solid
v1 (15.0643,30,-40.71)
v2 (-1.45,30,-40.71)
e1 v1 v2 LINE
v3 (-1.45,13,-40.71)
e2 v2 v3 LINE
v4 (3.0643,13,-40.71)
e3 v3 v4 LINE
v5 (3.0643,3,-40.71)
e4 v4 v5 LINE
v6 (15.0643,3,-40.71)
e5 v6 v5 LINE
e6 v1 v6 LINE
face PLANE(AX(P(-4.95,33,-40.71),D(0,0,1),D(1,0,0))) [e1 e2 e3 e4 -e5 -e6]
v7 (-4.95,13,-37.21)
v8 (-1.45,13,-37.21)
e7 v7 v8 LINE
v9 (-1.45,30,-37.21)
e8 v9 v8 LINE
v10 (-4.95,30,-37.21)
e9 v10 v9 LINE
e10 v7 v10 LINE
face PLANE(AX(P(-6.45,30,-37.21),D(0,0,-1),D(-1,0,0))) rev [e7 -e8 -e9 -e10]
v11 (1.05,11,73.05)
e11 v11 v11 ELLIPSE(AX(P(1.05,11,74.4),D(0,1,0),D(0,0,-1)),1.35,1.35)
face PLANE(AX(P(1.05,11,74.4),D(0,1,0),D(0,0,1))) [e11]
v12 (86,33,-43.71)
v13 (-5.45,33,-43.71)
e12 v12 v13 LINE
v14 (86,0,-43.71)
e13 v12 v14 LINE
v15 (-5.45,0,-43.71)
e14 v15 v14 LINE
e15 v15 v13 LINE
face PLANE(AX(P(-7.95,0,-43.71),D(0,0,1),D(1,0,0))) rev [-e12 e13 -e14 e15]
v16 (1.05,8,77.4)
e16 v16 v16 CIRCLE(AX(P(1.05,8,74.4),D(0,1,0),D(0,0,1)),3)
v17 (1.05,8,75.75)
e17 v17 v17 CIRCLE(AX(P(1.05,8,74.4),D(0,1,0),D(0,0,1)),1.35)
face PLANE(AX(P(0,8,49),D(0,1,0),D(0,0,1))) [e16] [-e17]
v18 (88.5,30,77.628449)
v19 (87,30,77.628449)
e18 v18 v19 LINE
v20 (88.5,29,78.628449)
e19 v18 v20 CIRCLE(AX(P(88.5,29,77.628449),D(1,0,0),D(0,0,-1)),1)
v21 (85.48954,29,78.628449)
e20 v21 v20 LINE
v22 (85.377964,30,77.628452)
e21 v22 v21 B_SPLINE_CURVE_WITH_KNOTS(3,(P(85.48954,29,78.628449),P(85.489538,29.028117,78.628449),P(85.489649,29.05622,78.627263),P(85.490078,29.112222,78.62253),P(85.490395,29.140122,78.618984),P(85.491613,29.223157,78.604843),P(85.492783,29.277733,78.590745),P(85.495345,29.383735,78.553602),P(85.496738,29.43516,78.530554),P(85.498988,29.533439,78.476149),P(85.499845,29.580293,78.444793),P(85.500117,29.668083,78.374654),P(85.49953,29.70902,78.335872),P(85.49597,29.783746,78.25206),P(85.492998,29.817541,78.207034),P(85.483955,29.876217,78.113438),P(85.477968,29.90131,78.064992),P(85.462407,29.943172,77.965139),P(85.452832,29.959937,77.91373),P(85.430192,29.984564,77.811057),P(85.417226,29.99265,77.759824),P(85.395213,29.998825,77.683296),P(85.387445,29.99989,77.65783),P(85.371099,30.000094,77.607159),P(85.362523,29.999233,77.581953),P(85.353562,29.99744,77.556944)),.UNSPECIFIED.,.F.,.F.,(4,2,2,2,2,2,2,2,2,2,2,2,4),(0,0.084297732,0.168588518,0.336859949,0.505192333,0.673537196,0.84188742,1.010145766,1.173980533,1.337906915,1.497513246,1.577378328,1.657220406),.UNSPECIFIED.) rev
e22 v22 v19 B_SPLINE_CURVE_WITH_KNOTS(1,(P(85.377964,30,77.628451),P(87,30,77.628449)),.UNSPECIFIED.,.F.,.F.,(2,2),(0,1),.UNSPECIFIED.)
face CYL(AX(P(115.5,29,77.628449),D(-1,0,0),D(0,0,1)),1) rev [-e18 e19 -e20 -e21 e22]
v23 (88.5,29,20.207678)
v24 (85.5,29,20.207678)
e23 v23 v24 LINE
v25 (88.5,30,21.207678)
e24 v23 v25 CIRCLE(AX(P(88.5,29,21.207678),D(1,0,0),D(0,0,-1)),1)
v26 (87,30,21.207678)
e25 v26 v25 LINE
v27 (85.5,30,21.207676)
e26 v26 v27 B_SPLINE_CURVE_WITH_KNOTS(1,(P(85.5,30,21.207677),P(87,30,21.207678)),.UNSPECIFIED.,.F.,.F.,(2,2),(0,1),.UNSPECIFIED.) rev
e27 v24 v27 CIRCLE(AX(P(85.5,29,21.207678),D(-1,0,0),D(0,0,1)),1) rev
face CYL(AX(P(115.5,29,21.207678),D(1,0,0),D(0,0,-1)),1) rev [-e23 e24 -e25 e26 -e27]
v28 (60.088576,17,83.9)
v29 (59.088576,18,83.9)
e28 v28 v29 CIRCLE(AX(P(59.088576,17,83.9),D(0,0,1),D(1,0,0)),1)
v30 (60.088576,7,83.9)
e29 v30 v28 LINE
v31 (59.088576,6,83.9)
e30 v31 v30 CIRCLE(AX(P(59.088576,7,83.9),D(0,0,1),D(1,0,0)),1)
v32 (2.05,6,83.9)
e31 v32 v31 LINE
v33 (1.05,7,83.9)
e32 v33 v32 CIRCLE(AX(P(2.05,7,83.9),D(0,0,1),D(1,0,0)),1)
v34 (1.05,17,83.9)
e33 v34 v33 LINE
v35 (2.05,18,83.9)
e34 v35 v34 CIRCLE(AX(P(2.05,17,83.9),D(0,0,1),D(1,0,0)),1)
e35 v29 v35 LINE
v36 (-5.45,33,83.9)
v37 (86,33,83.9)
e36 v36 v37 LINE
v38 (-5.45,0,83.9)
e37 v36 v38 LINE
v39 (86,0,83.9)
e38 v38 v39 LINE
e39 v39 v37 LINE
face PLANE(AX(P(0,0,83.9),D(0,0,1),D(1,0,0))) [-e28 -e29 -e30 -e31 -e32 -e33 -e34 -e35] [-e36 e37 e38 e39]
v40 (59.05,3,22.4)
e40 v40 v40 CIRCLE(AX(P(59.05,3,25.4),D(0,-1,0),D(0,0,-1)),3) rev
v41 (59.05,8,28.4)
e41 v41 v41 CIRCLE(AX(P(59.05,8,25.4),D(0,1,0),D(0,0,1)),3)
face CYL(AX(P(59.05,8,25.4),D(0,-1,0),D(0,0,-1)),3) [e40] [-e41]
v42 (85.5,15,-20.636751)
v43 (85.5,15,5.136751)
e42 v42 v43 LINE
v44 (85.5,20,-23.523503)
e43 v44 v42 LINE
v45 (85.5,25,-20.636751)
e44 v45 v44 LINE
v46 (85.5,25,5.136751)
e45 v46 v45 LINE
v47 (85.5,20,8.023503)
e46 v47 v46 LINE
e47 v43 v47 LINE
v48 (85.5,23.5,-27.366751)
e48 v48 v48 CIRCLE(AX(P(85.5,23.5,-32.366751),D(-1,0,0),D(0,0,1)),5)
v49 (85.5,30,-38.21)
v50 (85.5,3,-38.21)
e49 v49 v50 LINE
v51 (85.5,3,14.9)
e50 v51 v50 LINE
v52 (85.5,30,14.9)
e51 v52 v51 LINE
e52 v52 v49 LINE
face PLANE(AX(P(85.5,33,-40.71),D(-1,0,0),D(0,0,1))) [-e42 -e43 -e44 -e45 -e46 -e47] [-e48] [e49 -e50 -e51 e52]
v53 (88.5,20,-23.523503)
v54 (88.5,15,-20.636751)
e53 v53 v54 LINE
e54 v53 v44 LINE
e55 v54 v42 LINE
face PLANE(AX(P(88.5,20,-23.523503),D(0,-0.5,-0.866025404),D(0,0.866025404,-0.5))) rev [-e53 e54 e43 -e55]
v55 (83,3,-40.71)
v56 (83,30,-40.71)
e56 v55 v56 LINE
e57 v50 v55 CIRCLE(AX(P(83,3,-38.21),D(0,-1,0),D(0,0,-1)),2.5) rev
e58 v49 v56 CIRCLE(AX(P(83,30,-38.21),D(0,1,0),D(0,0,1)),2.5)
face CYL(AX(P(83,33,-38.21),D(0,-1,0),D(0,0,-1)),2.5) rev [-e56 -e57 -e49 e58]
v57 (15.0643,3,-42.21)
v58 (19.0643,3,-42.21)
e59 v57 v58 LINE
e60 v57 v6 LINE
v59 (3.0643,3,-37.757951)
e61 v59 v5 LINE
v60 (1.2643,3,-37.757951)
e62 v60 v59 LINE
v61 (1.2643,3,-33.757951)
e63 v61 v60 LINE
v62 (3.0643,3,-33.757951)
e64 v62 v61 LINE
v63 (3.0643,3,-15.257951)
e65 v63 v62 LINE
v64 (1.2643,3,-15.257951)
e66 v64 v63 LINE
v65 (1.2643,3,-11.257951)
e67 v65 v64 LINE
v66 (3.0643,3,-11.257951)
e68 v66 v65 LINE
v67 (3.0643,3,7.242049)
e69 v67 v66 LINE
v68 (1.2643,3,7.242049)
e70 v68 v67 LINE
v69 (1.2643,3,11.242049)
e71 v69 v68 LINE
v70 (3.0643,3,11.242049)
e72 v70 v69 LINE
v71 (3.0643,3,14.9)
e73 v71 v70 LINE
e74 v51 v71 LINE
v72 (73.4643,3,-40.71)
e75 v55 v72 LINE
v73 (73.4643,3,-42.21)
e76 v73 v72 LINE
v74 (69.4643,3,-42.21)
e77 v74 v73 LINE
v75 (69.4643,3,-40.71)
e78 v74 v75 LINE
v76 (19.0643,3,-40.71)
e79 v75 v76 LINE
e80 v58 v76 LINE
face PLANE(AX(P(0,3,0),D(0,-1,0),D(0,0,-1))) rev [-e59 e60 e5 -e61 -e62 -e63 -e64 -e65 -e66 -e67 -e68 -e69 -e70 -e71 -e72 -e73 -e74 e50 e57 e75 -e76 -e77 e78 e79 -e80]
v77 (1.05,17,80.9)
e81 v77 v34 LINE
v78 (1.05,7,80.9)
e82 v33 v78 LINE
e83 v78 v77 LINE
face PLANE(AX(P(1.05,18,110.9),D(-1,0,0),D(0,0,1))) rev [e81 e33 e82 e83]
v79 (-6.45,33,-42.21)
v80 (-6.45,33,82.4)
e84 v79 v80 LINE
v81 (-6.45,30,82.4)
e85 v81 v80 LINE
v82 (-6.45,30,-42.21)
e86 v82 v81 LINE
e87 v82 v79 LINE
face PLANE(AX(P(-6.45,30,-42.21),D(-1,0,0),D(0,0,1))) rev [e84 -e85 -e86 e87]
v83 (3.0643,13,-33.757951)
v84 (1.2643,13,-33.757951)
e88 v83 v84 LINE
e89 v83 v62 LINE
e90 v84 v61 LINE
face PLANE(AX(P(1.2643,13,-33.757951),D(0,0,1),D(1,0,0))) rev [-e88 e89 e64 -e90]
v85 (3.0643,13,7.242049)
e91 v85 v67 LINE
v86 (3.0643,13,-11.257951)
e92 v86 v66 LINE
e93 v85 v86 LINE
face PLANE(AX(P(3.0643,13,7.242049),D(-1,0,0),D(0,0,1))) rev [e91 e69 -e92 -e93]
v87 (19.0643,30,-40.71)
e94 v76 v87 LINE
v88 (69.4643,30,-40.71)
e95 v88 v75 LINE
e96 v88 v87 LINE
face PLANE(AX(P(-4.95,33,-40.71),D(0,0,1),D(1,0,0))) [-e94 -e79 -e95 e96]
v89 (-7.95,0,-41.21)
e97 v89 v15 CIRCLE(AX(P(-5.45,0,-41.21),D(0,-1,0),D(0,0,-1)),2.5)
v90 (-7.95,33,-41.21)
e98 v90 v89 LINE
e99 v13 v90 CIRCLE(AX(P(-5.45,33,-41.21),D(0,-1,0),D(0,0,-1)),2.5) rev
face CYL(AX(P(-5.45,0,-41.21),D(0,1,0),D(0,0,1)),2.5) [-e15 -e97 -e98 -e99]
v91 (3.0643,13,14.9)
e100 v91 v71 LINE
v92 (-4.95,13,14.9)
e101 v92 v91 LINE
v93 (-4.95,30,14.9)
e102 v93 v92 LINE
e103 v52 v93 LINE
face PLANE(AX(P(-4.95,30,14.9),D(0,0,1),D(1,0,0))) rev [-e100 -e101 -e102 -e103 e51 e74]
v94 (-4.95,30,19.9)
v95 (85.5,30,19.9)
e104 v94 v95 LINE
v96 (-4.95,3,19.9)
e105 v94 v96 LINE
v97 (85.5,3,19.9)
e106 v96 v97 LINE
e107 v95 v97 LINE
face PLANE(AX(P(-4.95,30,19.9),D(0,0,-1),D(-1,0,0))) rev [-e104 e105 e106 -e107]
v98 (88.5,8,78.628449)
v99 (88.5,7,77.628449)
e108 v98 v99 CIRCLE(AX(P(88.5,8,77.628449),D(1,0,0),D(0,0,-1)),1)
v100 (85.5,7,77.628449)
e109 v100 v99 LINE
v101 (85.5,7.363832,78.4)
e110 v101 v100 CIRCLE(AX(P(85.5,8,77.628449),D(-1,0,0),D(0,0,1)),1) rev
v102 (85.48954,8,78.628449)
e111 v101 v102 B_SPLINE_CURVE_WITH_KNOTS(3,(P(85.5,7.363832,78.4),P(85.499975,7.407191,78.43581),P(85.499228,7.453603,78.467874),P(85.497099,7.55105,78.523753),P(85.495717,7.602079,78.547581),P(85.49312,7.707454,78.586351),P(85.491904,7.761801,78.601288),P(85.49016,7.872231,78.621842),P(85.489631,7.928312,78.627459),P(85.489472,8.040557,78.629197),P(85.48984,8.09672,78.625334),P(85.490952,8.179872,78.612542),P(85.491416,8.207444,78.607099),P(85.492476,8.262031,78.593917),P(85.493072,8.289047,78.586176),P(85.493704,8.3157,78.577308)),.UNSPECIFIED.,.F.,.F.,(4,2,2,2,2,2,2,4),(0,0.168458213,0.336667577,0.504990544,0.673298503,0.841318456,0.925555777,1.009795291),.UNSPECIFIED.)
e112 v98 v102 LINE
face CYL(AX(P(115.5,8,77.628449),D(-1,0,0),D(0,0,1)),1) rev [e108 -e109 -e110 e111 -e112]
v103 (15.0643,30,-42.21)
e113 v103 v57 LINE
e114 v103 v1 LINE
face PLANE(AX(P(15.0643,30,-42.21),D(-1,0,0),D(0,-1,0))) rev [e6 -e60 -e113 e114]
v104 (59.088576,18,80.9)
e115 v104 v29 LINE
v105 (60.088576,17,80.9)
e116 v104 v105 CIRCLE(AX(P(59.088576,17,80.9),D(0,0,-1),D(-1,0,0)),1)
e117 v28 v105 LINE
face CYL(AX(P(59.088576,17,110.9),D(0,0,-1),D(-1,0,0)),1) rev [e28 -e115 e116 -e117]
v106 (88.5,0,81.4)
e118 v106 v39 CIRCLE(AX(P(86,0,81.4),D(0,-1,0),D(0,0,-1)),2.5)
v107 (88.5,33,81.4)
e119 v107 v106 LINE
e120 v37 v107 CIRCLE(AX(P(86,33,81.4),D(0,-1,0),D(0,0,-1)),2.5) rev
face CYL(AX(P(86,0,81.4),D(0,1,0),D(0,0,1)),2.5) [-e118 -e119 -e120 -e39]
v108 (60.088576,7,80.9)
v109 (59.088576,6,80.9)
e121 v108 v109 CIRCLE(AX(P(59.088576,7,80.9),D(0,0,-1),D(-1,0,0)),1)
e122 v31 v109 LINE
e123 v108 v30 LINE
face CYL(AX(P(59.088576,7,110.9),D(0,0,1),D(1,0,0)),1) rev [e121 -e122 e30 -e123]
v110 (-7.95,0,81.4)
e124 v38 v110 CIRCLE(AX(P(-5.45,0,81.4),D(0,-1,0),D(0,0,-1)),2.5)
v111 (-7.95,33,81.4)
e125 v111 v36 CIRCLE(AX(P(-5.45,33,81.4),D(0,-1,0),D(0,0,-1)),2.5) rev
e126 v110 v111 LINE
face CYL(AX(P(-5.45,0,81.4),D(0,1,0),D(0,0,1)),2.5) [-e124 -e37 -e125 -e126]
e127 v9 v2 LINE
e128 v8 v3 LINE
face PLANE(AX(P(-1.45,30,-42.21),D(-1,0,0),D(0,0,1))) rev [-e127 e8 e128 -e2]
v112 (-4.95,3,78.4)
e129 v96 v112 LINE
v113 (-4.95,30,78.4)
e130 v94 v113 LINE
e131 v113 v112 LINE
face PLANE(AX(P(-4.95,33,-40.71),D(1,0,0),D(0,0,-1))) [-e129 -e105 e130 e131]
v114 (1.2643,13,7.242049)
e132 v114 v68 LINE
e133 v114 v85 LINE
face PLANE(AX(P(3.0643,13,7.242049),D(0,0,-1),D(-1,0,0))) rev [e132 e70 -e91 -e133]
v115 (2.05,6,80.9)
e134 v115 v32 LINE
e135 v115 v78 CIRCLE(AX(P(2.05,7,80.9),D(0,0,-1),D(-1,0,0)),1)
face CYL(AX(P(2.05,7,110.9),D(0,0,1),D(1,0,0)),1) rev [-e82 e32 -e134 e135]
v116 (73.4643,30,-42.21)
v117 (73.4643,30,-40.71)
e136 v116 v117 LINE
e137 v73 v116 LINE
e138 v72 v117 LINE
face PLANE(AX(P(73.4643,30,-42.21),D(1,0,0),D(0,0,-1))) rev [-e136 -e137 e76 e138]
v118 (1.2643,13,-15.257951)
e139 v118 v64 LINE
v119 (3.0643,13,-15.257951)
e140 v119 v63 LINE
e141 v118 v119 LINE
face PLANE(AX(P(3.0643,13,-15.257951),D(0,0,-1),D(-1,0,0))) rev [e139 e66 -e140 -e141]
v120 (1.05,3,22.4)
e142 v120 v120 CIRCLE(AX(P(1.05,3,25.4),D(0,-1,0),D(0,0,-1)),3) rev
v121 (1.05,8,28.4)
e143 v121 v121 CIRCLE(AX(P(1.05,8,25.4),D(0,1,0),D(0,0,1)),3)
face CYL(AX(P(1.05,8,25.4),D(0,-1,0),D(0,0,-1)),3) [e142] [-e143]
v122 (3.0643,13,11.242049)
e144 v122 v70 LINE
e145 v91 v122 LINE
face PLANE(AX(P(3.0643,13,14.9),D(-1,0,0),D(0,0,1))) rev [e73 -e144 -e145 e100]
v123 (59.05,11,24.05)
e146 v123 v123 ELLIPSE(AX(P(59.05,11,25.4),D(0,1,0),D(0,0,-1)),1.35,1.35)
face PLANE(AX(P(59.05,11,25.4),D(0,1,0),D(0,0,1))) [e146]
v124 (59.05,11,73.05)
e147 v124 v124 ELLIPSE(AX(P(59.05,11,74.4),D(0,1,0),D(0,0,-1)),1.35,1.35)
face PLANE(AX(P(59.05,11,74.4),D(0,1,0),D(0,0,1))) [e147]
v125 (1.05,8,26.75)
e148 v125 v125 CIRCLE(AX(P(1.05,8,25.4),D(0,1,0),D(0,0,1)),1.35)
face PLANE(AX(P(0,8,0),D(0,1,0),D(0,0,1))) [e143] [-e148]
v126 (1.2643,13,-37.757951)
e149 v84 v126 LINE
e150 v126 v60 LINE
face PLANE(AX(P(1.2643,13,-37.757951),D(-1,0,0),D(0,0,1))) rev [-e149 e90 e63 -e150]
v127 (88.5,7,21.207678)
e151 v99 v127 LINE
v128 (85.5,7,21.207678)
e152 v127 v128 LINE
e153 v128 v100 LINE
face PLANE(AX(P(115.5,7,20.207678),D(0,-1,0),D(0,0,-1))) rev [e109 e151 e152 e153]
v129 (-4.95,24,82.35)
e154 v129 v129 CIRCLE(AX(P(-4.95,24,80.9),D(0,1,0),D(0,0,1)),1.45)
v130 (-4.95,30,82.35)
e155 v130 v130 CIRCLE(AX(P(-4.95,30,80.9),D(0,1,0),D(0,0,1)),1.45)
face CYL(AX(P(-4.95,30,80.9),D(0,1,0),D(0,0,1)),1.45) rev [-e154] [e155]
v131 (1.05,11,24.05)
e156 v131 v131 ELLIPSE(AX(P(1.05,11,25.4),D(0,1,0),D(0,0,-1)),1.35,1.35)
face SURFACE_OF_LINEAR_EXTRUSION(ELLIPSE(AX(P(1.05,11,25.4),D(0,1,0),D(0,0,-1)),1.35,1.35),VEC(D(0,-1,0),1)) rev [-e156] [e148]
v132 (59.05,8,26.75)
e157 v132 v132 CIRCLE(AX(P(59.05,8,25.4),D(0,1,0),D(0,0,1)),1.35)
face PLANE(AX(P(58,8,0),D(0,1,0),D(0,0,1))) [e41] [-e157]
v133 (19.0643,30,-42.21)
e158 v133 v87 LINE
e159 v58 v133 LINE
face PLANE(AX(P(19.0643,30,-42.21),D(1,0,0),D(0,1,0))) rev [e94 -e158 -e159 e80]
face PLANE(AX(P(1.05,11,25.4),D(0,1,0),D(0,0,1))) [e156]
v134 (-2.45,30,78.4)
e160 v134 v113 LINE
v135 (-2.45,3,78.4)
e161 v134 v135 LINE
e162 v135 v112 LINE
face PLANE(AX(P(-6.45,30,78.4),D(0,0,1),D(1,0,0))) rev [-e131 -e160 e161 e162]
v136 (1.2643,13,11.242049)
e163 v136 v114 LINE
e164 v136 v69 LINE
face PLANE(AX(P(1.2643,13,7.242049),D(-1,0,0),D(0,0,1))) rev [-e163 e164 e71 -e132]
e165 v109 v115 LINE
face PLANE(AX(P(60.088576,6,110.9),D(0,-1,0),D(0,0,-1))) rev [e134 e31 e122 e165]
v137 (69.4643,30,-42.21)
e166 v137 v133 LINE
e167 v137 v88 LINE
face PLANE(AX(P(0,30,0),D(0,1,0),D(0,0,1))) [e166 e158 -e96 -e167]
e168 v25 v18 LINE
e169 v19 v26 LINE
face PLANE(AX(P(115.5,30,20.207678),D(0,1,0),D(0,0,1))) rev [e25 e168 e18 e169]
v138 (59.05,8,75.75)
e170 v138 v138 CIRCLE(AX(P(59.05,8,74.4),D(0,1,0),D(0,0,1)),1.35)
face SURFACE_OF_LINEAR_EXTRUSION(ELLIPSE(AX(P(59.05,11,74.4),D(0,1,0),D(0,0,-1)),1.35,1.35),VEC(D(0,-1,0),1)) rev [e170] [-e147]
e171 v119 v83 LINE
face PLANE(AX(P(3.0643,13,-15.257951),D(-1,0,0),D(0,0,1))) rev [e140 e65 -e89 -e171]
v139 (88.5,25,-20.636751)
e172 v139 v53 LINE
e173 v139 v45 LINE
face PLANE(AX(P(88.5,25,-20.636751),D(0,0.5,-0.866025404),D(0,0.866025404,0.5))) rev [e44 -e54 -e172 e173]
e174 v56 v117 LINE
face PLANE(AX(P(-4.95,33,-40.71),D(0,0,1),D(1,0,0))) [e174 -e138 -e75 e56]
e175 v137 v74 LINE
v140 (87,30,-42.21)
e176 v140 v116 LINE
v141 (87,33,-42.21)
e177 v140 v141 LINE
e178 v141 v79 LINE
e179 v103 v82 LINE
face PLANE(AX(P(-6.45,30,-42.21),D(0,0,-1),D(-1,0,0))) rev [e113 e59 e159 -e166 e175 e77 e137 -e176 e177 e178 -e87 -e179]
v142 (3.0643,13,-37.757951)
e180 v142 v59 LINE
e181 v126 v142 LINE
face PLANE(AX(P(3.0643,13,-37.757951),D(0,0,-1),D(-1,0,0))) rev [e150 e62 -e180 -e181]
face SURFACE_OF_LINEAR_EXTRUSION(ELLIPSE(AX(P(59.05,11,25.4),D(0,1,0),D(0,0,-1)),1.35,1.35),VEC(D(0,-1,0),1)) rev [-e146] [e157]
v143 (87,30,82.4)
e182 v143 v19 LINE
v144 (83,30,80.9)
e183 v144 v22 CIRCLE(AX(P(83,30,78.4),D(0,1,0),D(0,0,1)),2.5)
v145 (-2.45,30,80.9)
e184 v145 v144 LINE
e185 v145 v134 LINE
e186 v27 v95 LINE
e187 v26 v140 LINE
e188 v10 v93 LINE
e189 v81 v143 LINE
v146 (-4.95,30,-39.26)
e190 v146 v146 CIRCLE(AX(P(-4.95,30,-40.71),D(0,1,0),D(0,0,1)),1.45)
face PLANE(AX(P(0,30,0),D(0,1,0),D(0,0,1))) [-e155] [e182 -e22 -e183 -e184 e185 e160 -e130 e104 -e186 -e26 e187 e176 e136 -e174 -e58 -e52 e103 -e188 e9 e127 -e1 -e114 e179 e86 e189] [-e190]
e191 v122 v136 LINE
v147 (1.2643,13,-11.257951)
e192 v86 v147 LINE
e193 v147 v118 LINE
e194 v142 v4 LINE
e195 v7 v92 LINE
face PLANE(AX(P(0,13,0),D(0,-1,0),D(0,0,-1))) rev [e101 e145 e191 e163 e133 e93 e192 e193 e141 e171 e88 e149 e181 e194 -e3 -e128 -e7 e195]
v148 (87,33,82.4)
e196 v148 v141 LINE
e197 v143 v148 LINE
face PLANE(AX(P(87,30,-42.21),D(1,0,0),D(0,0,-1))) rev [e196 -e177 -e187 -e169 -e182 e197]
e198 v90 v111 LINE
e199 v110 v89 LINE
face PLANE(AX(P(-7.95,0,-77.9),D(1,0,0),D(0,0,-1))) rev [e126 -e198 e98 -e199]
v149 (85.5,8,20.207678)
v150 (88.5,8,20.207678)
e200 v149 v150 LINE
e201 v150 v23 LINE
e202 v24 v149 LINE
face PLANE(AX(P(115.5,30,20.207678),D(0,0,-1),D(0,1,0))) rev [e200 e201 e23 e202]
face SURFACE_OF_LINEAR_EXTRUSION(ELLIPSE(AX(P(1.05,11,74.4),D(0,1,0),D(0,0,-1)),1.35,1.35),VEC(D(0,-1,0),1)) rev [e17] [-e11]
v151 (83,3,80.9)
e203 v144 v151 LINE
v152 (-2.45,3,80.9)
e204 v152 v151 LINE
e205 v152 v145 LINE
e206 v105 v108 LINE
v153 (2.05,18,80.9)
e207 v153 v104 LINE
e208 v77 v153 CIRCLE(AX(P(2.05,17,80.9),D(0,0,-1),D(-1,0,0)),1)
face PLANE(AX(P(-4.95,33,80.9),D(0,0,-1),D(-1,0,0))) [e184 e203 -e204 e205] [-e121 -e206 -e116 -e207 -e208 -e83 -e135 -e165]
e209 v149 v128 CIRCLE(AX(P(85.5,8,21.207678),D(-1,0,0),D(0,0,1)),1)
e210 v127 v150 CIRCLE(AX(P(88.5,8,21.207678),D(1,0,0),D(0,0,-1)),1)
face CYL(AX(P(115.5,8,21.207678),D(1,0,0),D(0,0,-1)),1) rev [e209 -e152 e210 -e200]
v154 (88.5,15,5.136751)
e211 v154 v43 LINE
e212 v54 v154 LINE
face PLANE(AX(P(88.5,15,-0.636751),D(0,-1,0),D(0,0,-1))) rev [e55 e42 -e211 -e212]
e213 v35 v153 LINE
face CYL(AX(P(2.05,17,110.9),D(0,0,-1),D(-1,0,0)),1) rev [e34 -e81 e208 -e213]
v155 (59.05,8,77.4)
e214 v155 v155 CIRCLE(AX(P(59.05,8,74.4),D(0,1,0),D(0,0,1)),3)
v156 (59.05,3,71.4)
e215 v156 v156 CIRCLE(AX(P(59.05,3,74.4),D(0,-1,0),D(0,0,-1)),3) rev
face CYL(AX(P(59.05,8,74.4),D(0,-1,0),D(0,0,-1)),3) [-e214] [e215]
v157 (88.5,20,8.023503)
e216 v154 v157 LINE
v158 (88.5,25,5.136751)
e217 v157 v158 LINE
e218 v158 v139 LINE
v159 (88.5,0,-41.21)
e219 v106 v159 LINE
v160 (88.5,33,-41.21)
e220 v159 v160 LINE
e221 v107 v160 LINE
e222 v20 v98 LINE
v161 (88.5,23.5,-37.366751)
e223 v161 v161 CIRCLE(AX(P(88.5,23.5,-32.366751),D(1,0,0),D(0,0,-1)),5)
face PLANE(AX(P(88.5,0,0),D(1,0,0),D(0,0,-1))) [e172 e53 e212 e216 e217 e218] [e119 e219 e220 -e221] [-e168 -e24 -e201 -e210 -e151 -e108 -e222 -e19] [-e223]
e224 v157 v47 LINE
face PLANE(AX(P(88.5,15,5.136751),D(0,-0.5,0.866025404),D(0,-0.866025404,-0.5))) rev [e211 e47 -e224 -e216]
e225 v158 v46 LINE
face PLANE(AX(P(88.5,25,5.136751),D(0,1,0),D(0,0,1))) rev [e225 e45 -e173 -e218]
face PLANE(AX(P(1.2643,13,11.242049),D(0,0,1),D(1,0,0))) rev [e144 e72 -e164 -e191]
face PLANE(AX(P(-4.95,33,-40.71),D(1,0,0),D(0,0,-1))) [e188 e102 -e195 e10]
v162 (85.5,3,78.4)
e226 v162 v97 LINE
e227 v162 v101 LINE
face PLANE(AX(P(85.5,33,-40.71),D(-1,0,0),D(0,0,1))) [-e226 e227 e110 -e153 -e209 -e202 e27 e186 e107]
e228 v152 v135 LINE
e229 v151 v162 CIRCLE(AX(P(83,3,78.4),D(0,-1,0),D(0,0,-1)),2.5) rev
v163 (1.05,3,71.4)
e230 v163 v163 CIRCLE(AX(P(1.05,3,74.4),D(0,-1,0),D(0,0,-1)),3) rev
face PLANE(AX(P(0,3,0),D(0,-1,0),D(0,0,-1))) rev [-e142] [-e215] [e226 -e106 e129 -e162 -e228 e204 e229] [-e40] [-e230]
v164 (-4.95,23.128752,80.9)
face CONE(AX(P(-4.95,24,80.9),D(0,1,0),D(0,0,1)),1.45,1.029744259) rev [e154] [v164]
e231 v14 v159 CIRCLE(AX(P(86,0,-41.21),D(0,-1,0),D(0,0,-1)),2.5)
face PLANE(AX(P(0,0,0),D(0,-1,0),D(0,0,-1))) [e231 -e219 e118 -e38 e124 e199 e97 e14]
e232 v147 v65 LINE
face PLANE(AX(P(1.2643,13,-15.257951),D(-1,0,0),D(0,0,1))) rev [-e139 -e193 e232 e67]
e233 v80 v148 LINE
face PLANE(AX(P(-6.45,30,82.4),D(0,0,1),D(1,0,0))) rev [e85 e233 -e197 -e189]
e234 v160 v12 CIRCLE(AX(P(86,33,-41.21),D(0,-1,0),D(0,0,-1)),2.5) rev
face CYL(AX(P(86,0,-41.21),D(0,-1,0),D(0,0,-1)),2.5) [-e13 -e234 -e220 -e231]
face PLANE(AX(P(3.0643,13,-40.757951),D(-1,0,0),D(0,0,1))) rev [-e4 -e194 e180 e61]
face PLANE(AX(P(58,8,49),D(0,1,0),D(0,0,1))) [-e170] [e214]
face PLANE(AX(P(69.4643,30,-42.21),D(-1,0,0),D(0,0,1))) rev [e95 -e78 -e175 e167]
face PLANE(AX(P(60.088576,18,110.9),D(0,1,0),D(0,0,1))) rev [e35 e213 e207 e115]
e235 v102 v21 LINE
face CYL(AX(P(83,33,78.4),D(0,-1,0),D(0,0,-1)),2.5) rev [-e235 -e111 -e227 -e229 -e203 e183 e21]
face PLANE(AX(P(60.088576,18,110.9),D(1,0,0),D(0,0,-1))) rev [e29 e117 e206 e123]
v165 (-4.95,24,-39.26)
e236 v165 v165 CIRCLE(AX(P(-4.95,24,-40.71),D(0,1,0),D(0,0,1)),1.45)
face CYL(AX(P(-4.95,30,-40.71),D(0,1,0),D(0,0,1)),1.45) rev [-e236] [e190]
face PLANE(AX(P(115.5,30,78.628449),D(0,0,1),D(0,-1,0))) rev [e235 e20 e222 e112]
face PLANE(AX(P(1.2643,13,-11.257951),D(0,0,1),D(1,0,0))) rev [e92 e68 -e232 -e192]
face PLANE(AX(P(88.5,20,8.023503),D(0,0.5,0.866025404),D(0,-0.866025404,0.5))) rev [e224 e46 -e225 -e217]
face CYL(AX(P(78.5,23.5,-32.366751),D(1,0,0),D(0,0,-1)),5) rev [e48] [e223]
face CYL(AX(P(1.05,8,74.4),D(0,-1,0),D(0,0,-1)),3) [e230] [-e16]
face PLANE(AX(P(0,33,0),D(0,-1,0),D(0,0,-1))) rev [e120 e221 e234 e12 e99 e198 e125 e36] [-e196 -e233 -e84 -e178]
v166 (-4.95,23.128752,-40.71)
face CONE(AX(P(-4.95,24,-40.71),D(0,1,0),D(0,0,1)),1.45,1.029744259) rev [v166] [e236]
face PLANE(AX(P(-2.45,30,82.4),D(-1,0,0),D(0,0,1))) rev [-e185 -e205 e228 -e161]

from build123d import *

# Parameters (mm, degrees)
SKETCH1_W                  = 165
SKETCH1_H                  = 155.8
BOSS_EXTRUDE1_DEPTH        = 3
SKETCH2_R                  = 3
SKETCH2_R_2                = 1.35
BOSS_EXTRUDE2_DEPTH        = 5
SKETCH5_RX                 = 1.35
SKETCH5_RY                 = 1.35
BOSS_EXTRUDE3_DEPTH        = 8
SKETCH6_W                  = 155.8
SKETCH6_H                  = 3
BOSS_EXTRUDE4_DEPTH        = 3
SKETCH7_W                  = 74.55
SKETCH7_H                  = 155.8
CUT_EXTRUDE1_DEPTH         = 3
SKETCH11_W                 = 93.45
SKETCH11_H                 = 34.19
CUT_EXTRUDE2_DEPTH         = 3
SKETCH12_W                 = 121.61
SKETCH12_H                 = 3
BOSS_EXTRUDE5_DEPTH        = 3
SKETCH13_W                 = 96.45
SKETCH13_H                 = 3
BOSS_EXTRUDE6_DEPTH        = 6
SKETCH14_W                 = 96.45
SKETCH14_H                 = 127.61
SKETCH14_W_2               = 90.45
SKETCH14_H_2               = 121.61
BOSS_EXTRUDE8_DEPTH        = 30
SKETCH15_W                 = 58.420771098
SKETCH15_H                 = 23
CUT_EXTRUDE3_DEPTH         = 30
SKETCH16_W                 = 59.038575843
SKETCH16_H                 = 12
CUT_EXTRUDE4_DEPTH         = 30
SKETCH17_W                 = 93.45
SKETCH17_H                 = 124.61
CUT_EXTRUDE5_DEPTH         = 3
CUT_EXTRUDE6_DEPTH         = 3
FILLET1_R                  = 2.5
FILLET3_R                  = 2.5
FILLET4_R                  = 2.5
FILLET5_R                  = 2.5
FILLET6_R                  = 2.5
FILLET7_R                  = 2.5
FILLET8_R                  = 2.5
FILLET9_R                  = 2.5
FILLET10_R                 = 1
FILLET11_R                 = 1
FILLET12_R                 = 1
FILLET13_R                 = 1
FILLET14_R                 = 1
FILLET15_R                 = 1
FILLET16_R                 = 1
FILLET17_R                 = 1
SKETCH23_R                 = 5
CUT_EXTRUDE11_DEPTH        = 10
SKETCH26_W                 = 90.45
SKETCH26_H                 = 5
BOSS_EXTRUDE9_DEPTH        = 27
BOSS_EXTRUDE10_DEPTH       = 10
SKETCH28_W                 = 4
SKETCH28_H                 = 27
CUT_EXTRUDE12_DEPTH        = 1.5
SKETCH29_W                 = 5
SKETCH29_H                 = 5
BOSS_EXTRUDE11_DEPTH       = 17
SKETCH30_W                 = 4
SKETCH30_H                 = 4
BOSS_EXTRUDE12_DEPTH       = 27
M2_5_CLEARANCE_HOLE1_D     = 2.9
M2_5_CLEARANCE_HOLE1_DEPTH = 6
M2_5_CLEARANCE_HOLE1_TIP   = 0.871247898


with BuildPart() as part:
    # Sketch1 → Boss-Extrude1 (new body)
    with BuildSketch(Plane(origin=(0, 0, 0), x_dir=(1, 0, 0), z_dir=(0, 1, 0))):
        Rectangle(SKETCH1_W, SKETCH1_H)
    extrude(amount=BOSS_EXTRUDE1_DEPTH)

    # Sketch2 → Boss-Extrude2 (add)
    with BuildSketch(Plane(origin=(0, 3, 0), x_dir=(1, 0, 0), z_dir=(0, 1, 0))):
        with Locations(Location((1.05, -25.4, 0), (0, 0, 90))):
            Circle(SKETCH2_R)
        with Locations(Location((1.05, -25.4, 0), (0, 0, 270))):
            Circle(SKETCH2_R_2, mode=Mode.SUBTRACT)
    boss_extrude2 = extrude(amount=BOSS_EXTRUDE2_DEPTH)

    # Sketch5 → Boss-Extrude3 (add)
    with BuildSketch(Plane(origin=(0, 3, 0), x_dir=(1, 0, 0), z_dir=(0, 1, 0))):
        with Locations((1.05, -25.4)):
            Ellipse(SKETCH5_RX, SKETCH5_RY)
    boss_extrude3 = extrude(amount=BOSS_EXTRUDE3_DEPTH)

    # Sketch-Pattern1: Boss-Extrude2, Boss-Extrude3 at 3 more places
    with Locations((58, 0, 49), (0, 0, 49), (58, 0, 0)):
        add(boss_extrude2)
        add(boss_extrude3)

    # Sketch6 → Boss-Extrude4 (add)
    with BuildSketch(Plane(origin=(82.5, 0, 0), x_dir=(0, 0, -1), z_dir=(1, 0, 0))):
        with Locations((0, 1.5)):
            Rectangle(SKETCH6_W, SKETCH6_H)
    extrude(amount=BOSS_EXTRUDE4_DEPTH)

    # Sketch7 → Cut-Extrude1 (cut)
    with BuildSketch(Plane(origin=(0, 3, 0), x_dir=(1, 0, 0), z_dir=(0, 1, 0))):
        with Locations((-45.225, 0)):
            Rectangle(SKETCH7_W, SKETCH7_H)
    extrude(amount=-CUT_EXTRUDE1_DEPTH, mode=Mode.SUBTRACT)

    # Sketch11 → Cut-Extrude2 (cut)
    with BuildSketch(Plane(origin=(0, 3, 0), x_dir=(1, 0, 0), z_dir=(0, 1, 0))):
        with Locations((38.775, 60.805)):
            Rectangle(SKETCH11_W, SKETCH11_H)
    extrude(amount=-CUT_EXTRUDE2_DEPTH, mode=Mode.SUBTRACT)

    # Sketch12 → Boss-Extrude5 (add)
    with BuildSketch(Plane(origin=(85.5, 0, 0), x_dir=(0, 0, -1), z_dir=(1, 0, 0))):
        with Locations((-17.095, 1.5)):
            Rectangle(SKETCH12_W, SKETCH12_H)
    extrude(amount=BOSS_EXTRUDE5_DEPTH)

    # Sketch13 → Boss-Extrude6 (add)
    with BuildSketch(Plane.XY.offset(77.9)):
        with Locations((40.275, 1.5)):
            Rectangle(SKETCH13_W, SKETCH13_H)
    extrude(amount=BOSS_EXTRUDE6_DEPTH)

    # Sketch14 → Boss-Extrude8 (add)
    with BuildSketch(Plane(origin=(0, 3, 0), x_dir=(1, 0, 0), z_dir=(0, 1, 0))):
        with Locations((40.275, -20.095)):
            Rectangle(SKETCH14_W, SKETCH14_H)
        with Locations((40.275, -20.095)):
            Rectangle(SKETCH14_W_2, SKETCH14_H_2, mode=Mode.SUBTRACT)
    extrude(amount=BOSS_EXTRUDE8_DEPTH)

    # Sketch15 → Cut-Extrude3 (cut)
    with BuildSketch(Plane.ZY.offset(-85.5)):
        with Locations((49.418063701, 18.5)):
            Rectangle(SKETCH15_W, SKETCH15_H)
    extrude(amount=-CUT_EXTRUDE3_DEPTH, mode=Mode.SUBTRACT)

    # Sketch16 → Cut-Extrude4 (cut)
    with BuildSketch(Plane(origin=(0, 0, 80.9), x_dir=(-1, 0, 0), z_dir=(0, 0, -1))):
        with Locations((-30.569287921, 12)):
            Rectangle(SKETCH16_W, SKETCH16_H)
    extrude(amount=-CUT_EXTRUDE4_DEPTH, mode=Mode.SUBTRACT)

    # Sketch17 → Cut-Extrude5 (cut)
    with BuildSketch(Plane(origin=(0, 33, 0), x_dir=(1, 0, 0), z_dir=(0, 1, 0))):
        with Locations((40.275, -20.095)):
            Rectangle(SKETCH17_W, SKETCH17_H)
    extrude(amount=-CUT_EXTRUDE5_DEPTH, mode=Mode.SUBTRACT)

    # Sketch19 → Cut-Extrude6 (cut)
    with BuildSketch(Plane.ZY.offset(-85.5)):
        Polygon((-14.863248654, 25), (-20.636751346, 25), (-23.523502692, 20), (-20.636751346, 15), (-14.863248654, 15), (-0.636751346, 15), (5.136751346, 15), (8.023502692, 20), (5.136751346, 25), (-0.636751346, 25), align=None)
    extrude(amount=-CUT_EXTRUDE6_DEPTH, mode=Mode.SUBTRACT)

    # Fillet1
    fillet1_edges = [part.edges().sort_by_distance(p)[0] for p in [
        (-7.95, 16.5, 83.9),
    ]]
    fillet(fillet1_edges, radius=FILLET1_R)

    # Fillet3
    fillet3_edges = [part.edges().sort_by_distance(p)[0] for p in [
        (88.5, 16.5, 83.9),
    ]]
    fillet(fillet3_edges, radius=FILLET3_R)

    # Fillet4
    fillet4_edges = [part.edges().sort_by_distance(p)[0] for p in [
        (88.5, 16.5, -43.71),
    ]]
    fillet(fillet4_edges, radius=FILLET4_R)

    # Fillet5
    fillet5_edges = [part.edges().sort_by_distance(p)[0] for p in [
        (-7.95, 16.5, -43.71),
    ]]
    fillet(fillet5_edges, radius=FILLET5_R)

    # Fillet6
    fillet6_edges = [part.edges().sort_by_distance(p)[0] for p in [
        (85.5, 16.5, -40.71),
    ]]
    fillet(fillet6_edges, radius=FILLET6_R)

    # Fillet7
    fillet7_edges = [part.edges().sort_by_distance(p)[0] for p in [
        (-4.95, 16.5, -40.71),
    ]]
    fillet(fillet7_edges, radius=FILLET7_R)

    # Fillet8
    fillet8_edges = [part.edges().sort_by_distance(p)[0] for p in [
        (-4.95, 16.5, 80.9),
    ]]
    fillet(fillet8_edges, radius=FILLET8_R)

    # Fillet9
    fillet9_edges = [part.edges().sort_by_distance(p)[0] for p in [
        (85.5, 16.5, 80.9),
    ]]
    fillet(fillet9_edges, radius=FILLET9_R)

    # Fillet10
    # the kernel refuses this fillet: 1 mm, written as the material it adds along each edge
    with BuildSketch(Plane(origin=(84.5, 30, 78.62844925), x_dir=(0, -1, 0), z_dir=(1, 0, 0))) as fillet10_piece_1_section:
        with BuildLine():
            CenterArc((FILLET10_R, FILLET10_R), FILLET10_R, 180, 90)
            Line((0, FILLET10_R), (0, 0))
            Line((0, 0), (FILLET10_R, 0))
        make_face()
    fillet10_piece_1 = extrude(amount=4, mode=Mode.PRIVATE)
    fillet10_piece_1 = fillet10_piece_1 - Plane(origin=(83, 29.753252257, 78.4), x_dir=(0, 0, 1), z_dir=(0, 1, 0)) * Cylinder(2.5, 12, mode=Mode.PRIVATE)
    fillet10_piece_1 = split(fillet10_piece_1, bisect_by=Plane(origin=(86.246243514, 30, 78.424249714), z_dir=(0, -1, 0)), keep=Keep.TOP, mode=Mode.PRIVATE)
    fillet10_piece_1 = split(fillet10_piece_1, bisect_by=Plane(origin=(87, 29.753252257, 78.424249714), z_dir=(-1, 0, 0)), keep=Keep.TOP, mode=Mode.PRIVATE)
    add(fillet10_piece_1)
    with BuildSketch(Plane(origin=(87, 30, 78.62844925), x_dir=(0, -1, 0), z_dir=(1, 0, 0))) as fillet10_piece_2_section:
        with BuildLine():
            CenterArc((FILLET10_R, FILLET10_R), FILLET10_R, 180, 90)
            Line((0, FILLET10_R), (0, 0))
            Line((0, 0), (FILLET10_R, 0))
        make_face()
    fillet10_piece_2 = extrude(amount=1.5, mode=Mode.PRIVATE)
    fillet10_piece_2 = split(fillet10_piece_2, bisect_by=Plane(origin=(87.75, 30, 78.42497612), z_dir=(0, -1, 0)), keep=Keep.TOP, mode=Mode.PRIVATE)
    add(fillet10_piece_2)

    # Fillet11
    # the kernel refuses this fillet: 1 mm, written as the material it adds along each edge
    with BuildSketch(Plane(origin=(84.5, 30, 20.207678152), x_dir=(0, -1, 0), z_dir=(1, 0, 0))) as fillet11_piece_1_section:
        with BuildLine():
            CenterArc((FILLET11_R, -FILLET11_R), FILLET11_R, 90, 90)
            Line((0, -FILLET11_R), (0, 0))
            Line((0, 0), (FILLET11_R, 0))
        make_face()
    fillet11_piece_1 = extrude(amount=4, mode=Mode.PRIVATE)
    fillet11_piece_1 = split(fillet11_piece_1, bisect_by=Plane(origin=(86.25, 30, 20.411151282), z_dir=(0, -1, 0)), keep=Keep.TOP, mode=Mode.PRIVATE)
    fillet11_piece_1 = split(fillet11_piece_1, bisect_by=Plane(origin=(85.5, 29.75304895, 20.411151282), z_dir=(1, 0, 0)), keep=Keep.TOP, mode=Mode.PRIVATE)
    fillet11_piece_1 = split(fillet11_piece_1, bisect_by=Plane(origin=(87, 29.75304895, 20.411151282), z_dir=(-1, 0, 0)), keep=Keep.TOP, mode=Mode.PRIVATE)
    add(fillet11_piece_1)
    with BuildSketch(Plane(origin=(87, 30, 20.207678152), x_dir=(0, -1, 0), z_dir=(1, 0, 0))) as fillet11_piece_2_section:
        with BuildLine():
            CenterArc((FILLET11_R, -FILLET11_R), FILLET11_R, 90, 90)
            Line((0, -FILLET11_R), (0, 0))
            Line((0, 0), (FILLET11_R, 0))
        make_face()
    fillet11_piece_2 = extrude(amount=1.5, mode=Mode.PRIVATE)
    fillet11_piece_2 = split(fillet11_piece_2, bisect_by=Plane(origin=(87.75, 30, 20.411151282), z_dir=(0, -1, 0)), keep=Keep.TOP, mode=Mode.PRIVATE)
    add(fillet11_piece_2)

    # Fillet12
    fillet12_edges = [part.edges().sort_by_distance(p)[0] for p in [
        (87, 7, 20.207678152),
    ]]
    fillet(fillet12_edges, radius=FILLET12_R)

    # Fillet13
    fillet13_edges = [part.edges().sort_by_distance(p)[0] for p in [
        (86.994770154, 7, 78.62844925),
    ]]
    fillet(fillet13_edges, radius=FILLET13_R)

    # Fillet14
    fillet14_edges = [part.edges().sort_by_distance(p)[0] for p in [
        (1.05, 18, 82.4),
    ]]
    fillet(fillet14_edges, radius=FILLET14_R)

    # Fillet15
    fillet15_edges = [part.edges().sort_by_distance(p)[0] for p in [
        (60.088575843, 6, 82.4),
    ]]
    fillet(fillet15_edges, radius=FILLET15_R)

    # Fillet16
    fillet16_edges = [part.edges().sort_by_distance(p)[0] for p in [
        (60.088575843, 18, 82.4),
    ]]
    fillet(fillet16_edges, radius=FILLET16_R)

    # Fillet17
    fillet17_edges = [part.edges().sort_by_distance(p)[0] for p in [
        (1.05, 6, 82.4),
    ]]
    fillet(fillet17_edges, radius=FILLET17_R)

    # Sketch23 → Cut-Extrude11 (cut)
    with BuildSketch(Plane(origin=(88.5, 0, 0), x_dir=(0, 0, -1), z_dir=(1, 0, 0))):
        with Locations((32.366751346, 23.5)):
            Circle(SKETCH23_R)
    extrude(amount=-CUT_EXTRUDE11_DEPTH, mode=Mode.SUBTRACT)

    # Sketch26 → Boss-Extrude9 (add)
    with BuildSketch(Plane(origin=(0, 3, 0), x_dir=(1, 0, 0), z_dir=(0, 1, 0))):
        with Locations((40.275, -17.4)):
            Rectangle(SKETCH26_W, SKETCH26_H)
    extrude(amount=BOSS_EXTRUDE9_DEPTH)

    # Sketch27 → Boss-Extrude10 (add)
    with BuildSketch(Plane(origin=(0, 3, 0), x_dir=(1, 0, 0), z_dir=(0, 1, 0))):
        Polygon((3.0643, -14.9), (-4.95, -14.9), (-4.95, 40.757951229), (3.0643, 40.757951229), (3.0643, 37.757951229), (1.2643, 37.757951229), (1.2643, 33.757951229), (3.0643, 33.757951229), (3.0643, 15.257951229), (1.2643, 15.257951229), (1.2643, 11.257951229), (3.0643, 11.257951229), (3.0643, -7.242048771), (1.2643, -7.242048771), (1.2643, -11.242048771), (3.0643, -11.242048771), align=None)
    extrude(amount=BOSS_EXTRUDE10_DEPTH)

    # Sketch28 → Cut-Extrude12 (cut)
    with BuildSketch(Plane.XY.offset(-40.71)):
        with Locations((17.0643, 16.5)):
            Rectangle(SKETCH28_W, SKETCH28_H)
        with Locations((71.4643, 16.5)):
            Rectangle(SKETCH28_W, SKETCH28_H)
    extrude(amount=-CUT_EXTRUDE12_DEPTH, mode=Mode.SUBTRACT)

    # Sketch29 → Boss-Extrude11 (add)
    with BuildSketch(Plane(origin=(0, 13, 0), x_dir=(1, 0, 0), z_dir=(0, 1, 0))):
        with Locations((-3.95, 39.71)):
            Rectangle(SKETCH29_W, SKETCH29_H)
    extrude(amount=BOSS_EXTRUDE11_DEPTH)

    # Sketch30 → Boss-Extrude12 (add)
    with BuildSketch(Plane(origin=(0, 3, 0), x_dir=(1, 0, 0), z_dir=(0, 1, 0))):
        with Locations((-4.45, -80.4)):
            Rectangle(SKETCH30_W, SKETCH30_H)
    extrude(amount=BOSS_EXTRUDE12_DEPTH)

    # M2.5 Clearance Hole1
    with Locations(Plane(origin=(-4.95, 30, -40.71), x_dir=(0, 0, 1), z_dir=(0, 1, 0))):
        with Locations((0, 0), (121.61, 0)):
            Hole(M2_5_CLEARANCE_HOLE1_D / 2, depth=M2_5_CLEARANCE_HOLE1_DEPTH)
            with Locations((0, 0, -(M2_5_CLEARANCE_HOLE1_DEPTH + M2_5_CLEARANCE_HOLE1_TIP / 2))):  # 118° drill point
                Cone(0, M2_5_CLEARANCE_HOLE1_D / 2, M2_5_CLEARANCE_HOLE1_TIP, mode=Mode.SUBTRACT)


solid = part.part
